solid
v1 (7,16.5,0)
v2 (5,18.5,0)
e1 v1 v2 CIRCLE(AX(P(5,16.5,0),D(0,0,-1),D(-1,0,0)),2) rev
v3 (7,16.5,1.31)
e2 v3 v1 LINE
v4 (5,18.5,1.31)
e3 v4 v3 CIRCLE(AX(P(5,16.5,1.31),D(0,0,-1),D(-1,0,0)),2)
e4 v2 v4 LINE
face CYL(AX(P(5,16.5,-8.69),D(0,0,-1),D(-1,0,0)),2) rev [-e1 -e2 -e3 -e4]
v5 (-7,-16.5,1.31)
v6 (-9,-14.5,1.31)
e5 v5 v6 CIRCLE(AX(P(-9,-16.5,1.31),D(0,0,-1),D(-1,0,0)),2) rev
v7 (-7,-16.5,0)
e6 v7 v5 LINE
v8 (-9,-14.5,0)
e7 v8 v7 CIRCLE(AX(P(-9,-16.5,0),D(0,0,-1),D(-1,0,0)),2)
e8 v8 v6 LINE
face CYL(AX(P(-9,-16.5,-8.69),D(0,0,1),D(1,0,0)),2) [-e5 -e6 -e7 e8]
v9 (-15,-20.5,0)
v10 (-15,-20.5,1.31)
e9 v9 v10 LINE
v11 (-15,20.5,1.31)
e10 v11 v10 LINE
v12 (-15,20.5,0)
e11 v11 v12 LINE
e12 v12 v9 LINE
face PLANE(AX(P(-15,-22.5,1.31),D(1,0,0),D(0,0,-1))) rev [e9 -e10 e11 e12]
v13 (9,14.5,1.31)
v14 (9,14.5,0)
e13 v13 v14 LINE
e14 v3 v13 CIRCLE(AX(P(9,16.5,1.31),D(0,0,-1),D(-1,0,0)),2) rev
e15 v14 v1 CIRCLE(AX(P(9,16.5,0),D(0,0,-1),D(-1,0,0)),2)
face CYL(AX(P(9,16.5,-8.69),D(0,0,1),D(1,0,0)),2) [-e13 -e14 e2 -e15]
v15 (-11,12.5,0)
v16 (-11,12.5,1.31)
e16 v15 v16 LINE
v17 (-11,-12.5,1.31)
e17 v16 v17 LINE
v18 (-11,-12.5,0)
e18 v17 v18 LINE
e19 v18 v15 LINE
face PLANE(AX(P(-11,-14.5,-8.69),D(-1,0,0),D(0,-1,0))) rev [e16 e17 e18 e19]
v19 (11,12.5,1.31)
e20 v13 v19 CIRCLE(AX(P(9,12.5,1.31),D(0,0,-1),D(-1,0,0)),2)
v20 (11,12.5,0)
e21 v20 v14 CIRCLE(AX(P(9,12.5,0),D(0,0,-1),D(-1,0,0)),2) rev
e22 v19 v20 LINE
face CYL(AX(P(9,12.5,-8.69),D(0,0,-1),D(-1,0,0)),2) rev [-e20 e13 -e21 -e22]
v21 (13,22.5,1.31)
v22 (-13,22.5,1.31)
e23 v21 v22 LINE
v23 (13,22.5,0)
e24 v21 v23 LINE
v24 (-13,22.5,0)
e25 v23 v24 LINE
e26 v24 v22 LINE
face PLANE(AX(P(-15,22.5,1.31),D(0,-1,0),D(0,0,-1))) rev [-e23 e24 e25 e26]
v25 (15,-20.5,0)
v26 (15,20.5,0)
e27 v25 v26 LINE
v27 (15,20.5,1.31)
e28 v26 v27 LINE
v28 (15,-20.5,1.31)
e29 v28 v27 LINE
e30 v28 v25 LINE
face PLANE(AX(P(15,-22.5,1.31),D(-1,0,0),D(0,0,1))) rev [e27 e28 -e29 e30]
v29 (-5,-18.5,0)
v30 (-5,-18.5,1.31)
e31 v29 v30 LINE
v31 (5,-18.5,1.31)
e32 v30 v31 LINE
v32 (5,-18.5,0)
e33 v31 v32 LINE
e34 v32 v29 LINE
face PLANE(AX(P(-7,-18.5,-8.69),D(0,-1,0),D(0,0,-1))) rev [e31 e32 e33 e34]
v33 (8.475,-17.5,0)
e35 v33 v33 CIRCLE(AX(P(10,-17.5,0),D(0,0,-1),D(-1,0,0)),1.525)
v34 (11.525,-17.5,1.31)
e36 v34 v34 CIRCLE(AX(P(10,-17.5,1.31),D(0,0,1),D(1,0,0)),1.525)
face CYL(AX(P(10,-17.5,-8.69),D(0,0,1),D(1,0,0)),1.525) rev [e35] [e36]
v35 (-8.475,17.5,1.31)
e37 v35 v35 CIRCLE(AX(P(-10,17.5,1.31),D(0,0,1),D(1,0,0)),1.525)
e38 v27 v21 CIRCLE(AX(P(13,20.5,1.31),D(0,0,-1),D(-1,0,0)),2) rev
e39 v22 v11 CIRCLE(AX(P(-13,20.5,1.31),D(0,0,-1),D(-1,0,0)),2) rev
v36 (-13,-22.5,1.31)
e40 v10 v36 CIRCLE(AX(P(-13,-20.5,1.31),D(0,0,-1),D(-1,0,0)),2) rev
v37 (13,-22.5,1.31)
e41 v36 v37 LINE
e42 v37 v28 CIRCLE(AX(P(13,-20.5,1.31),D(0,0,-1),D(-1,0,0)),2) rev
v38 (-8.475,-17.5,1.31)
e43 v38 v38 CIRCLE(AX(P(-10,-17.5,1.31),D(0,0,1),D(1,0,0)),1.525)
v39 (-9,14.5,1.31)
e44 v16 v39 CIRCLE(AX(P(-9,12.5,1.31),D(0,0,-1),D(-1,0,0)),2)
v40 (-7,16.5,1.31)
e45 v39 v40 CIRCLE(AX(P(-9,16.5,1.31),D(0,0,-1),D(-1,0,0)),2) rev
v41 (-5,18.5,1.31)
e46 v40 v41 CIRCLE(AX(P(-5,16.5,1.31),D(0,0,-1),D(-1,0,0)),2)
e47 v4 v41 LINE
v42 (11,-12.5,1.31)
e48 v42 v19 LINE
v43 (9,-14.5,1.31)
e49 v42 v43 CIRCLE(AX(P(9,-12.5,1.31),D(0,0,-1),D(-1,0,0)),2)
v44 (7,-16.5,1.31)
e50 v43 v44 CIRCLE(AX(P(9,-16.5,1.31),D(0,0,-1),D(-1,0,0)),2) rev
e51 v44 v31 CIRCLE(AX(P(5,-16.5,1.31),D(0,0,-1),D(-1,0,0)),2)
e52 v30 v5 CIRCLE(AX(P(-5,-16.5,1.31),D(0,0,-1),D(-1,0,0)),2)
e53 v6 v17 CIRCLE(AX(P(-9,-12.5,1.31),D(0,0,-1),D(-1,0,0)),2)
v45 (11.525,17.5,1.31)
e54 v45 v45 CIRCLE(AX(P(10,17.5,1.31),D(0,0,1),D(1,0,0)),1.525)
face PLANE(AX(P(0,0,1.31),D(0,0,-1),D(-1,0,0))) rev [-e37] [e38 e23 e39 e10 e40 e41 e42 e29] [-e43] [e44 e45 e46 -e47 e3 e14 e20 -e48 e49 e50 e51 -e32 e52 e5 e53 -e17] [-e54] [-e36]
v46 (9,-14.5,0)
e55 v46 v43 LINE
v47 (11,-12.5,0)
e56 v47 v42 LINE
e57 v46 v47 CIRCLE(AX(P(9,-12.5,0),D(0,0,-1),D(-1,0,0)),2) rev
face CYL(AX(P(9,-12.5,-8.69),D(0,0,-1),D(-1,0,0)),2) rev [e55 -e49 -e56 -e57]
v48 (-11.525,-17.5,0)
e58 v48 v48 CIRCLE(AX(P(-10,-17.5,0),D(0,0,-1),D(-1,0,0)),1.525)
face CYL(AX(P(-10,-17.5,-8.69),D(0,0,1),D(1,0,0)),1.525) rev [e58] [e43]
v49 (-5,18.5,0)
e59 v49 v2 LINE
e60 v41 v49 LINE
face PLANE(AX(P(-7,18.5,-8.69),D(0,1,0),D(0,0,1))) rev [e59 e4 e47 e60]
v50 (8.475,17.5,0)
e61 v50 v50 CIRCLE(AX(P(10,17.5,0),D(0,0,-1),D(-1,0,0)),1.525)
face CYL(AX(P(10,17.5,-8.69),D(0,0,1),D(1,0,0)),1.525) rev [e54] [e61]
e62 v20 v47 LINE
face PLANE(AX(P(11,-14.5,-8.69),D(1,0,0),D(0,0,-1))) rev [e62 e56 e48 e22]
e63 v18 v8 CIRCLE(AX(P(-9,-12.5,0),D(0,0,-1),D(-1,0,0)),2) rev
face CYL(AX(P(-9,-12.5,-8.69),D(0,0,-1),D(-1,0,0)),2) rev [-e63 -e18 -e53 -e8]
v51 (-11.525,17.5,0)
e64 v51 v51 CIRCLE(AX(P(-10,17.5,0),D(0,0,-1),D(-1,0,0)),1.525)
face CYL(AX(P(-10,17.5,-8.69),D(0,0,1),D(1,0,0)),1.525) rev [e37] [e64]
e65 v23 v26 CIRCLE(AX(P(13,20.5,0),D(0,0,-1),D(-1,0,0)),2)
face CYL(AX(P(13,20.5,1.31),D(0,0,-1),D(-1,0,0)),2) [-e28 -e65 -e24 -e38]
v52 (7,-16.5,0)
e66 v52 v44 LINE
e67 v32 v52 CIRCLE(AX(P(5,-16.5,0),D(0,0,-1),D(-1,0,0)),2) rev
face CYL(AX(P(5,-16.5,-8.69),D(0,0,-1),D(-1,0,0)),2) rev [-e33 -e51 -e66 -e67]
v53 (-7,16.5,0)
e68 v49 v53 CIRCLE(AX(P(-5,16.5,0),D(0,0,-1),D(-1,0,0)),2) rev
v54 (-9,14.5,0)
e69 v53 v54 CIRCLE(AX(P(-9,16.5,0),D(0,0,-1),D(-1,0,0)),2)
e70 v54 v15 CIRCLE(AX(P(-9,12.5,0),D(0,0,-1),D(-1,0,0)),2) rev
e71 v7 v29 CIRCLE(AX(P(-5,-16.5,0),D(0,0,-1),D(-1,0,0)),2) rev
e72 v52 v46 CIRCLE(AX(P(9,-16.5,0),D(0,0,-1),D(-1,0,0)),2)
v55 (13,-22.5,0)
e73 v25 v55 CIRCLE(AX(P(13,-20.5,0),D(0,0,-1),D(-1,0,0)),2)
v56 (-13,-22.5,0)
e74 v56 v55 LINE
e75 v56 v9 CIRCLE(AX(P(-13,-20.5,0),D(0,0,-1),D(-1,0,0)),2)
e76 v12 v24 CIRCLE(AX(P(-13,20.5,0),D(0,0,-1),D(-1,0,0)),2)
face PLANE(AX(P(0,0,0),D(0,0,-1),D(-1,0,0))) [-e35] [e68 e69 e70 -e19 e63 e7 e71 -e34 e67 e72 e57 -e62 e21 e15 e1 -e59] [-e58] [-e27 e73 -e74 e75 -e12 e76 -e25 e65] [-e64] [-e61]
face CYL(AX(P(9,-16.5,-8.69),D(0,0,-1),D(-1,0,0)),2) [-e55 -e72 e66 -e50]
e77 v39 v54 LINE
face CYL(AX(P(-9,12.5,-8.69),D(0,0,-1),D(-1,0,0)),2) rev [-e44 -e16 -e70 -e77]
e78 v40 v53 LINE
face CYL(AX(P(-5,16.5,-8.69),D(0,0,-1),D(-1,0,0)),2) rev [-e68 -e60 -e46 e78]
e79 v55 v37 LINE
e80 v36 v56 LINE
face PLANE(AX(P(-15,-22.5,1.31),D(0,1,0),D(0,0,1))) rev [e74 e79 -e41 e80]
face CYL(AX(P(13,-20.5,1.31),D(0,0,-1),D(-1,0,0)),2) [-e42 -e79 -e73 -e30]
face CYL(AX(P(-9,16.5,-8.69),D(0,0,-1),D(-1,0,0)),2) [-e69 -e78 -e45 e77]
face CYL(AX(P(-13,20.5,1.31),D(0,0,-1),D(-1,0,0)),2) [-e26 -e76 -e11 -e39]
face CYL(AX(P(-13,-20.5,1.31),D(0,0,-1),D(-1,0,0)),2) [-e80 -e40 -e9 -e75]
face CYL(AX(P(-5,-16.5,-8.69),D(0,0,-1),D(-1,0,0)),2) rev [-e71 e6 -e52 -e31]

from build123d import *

# Parameters (mm, degrees)
SKETCH_1_W          = 30
SKETCH_1_H          = 45
EXTRUDE_1_DEPTH     = 1.31
SKETCH_2_R          = 1.525
CUT_EXTRUDE_1_DEPTH = 10
SKETCH_3_W          = 14
SKETCH_3_H          = 37
CUT_EXTRUDE_2_DEPTH = 10
SKETCH_4_W          = 22
SKETCH_4_H          = 29
CUT_EXTRUDE_3_DEPTH = 10
FILLET_1_R          = 2
FILLET_2_R          = 2


with BuildPart() as part:
    # 草图1 → 凸台-拉伸1 (new body)
    with BuildSketch(Plane.XY):
        Rectangle(SKETCH_1_W, SKETCH_1_H)
    extrude(amount=EXTRUDE_1_DEPTH)

    # 草图2 → 切除-拉伸1 (cut)
    with BuildSketch(Plane.XY.offset(1.31)):
        with Locations((-10, 17.5)):
            Circle(SKETCH_2_R)
        with Locations((10, 17.5)):
            Circle(SKETCH_2_R)
        with Locations((-10, -17.5)):
            Circle(SKETCH_2_R)
        with Locations((10, -17.5)):
            Circle(SKETCH_2_R)
    extrude(amount=-CUT_EXTRUDE_1_DEPTH, mode=Mode.SUBTRACT)

    # 草图3 → 切除-拉伸2 (cut)
    with BuildSketch(Plane.XY.offset(1.31)):
        Rectangle(SKETCH_3_W, SKETCH_3_H)
    extrude(amount=-CUT_EXTRUDE_2_DEPTH, mode=Mode.SUBTRACT)

    # 草图4 → 切除-拉伸3 (cut)
    with BuildSketch(Plane.XY.offset(1.31)):
        Rectangle(SKETCH_4_W, SKETCH_4_H)
    extrude(amount=-CUT_EXTRUDE_3_DEPTH, mode=Mode.SUBTRACT)

    # 圆角1
    fillet_1_edges = [part.edges().sort_by_distance(p)[0] for p in [
        (-7, -18.5, 0.655),
        (11, -14.5, 0.655),
        (11, 14.5, 0.655),
        (7, 14.5, 0.655),
        (7, 18.5, 0.655),
        (-7, 18.5, 0.655),
        (-7, 14.5, 0.655),
        (-11, 14.5, 0.655),
        (-11, -14.5, 0.655),
        (-7, -14.5, 0.655),
        (7, -14.5, 0.655),
        (7, -18.5, 0.655),
    ]]
    fillet(fillet_1_edges, radius=FILLET_1_R - 0.0001)  # a hair under: the kernel refuses the full size

    # 圆角2
    fillet_2_edges = [part.edges().sort_by_distance(p)[0] for p in [
        (15, -22.5, 0.655),
        (-15, -22.5, 0.655),
        (-15, 22.5, 0.655),
        (15, 22.5, 0.655),
    ]]
    fillet(fillet_2_edges, radius=FILLET_2_R)


solid = part.part
